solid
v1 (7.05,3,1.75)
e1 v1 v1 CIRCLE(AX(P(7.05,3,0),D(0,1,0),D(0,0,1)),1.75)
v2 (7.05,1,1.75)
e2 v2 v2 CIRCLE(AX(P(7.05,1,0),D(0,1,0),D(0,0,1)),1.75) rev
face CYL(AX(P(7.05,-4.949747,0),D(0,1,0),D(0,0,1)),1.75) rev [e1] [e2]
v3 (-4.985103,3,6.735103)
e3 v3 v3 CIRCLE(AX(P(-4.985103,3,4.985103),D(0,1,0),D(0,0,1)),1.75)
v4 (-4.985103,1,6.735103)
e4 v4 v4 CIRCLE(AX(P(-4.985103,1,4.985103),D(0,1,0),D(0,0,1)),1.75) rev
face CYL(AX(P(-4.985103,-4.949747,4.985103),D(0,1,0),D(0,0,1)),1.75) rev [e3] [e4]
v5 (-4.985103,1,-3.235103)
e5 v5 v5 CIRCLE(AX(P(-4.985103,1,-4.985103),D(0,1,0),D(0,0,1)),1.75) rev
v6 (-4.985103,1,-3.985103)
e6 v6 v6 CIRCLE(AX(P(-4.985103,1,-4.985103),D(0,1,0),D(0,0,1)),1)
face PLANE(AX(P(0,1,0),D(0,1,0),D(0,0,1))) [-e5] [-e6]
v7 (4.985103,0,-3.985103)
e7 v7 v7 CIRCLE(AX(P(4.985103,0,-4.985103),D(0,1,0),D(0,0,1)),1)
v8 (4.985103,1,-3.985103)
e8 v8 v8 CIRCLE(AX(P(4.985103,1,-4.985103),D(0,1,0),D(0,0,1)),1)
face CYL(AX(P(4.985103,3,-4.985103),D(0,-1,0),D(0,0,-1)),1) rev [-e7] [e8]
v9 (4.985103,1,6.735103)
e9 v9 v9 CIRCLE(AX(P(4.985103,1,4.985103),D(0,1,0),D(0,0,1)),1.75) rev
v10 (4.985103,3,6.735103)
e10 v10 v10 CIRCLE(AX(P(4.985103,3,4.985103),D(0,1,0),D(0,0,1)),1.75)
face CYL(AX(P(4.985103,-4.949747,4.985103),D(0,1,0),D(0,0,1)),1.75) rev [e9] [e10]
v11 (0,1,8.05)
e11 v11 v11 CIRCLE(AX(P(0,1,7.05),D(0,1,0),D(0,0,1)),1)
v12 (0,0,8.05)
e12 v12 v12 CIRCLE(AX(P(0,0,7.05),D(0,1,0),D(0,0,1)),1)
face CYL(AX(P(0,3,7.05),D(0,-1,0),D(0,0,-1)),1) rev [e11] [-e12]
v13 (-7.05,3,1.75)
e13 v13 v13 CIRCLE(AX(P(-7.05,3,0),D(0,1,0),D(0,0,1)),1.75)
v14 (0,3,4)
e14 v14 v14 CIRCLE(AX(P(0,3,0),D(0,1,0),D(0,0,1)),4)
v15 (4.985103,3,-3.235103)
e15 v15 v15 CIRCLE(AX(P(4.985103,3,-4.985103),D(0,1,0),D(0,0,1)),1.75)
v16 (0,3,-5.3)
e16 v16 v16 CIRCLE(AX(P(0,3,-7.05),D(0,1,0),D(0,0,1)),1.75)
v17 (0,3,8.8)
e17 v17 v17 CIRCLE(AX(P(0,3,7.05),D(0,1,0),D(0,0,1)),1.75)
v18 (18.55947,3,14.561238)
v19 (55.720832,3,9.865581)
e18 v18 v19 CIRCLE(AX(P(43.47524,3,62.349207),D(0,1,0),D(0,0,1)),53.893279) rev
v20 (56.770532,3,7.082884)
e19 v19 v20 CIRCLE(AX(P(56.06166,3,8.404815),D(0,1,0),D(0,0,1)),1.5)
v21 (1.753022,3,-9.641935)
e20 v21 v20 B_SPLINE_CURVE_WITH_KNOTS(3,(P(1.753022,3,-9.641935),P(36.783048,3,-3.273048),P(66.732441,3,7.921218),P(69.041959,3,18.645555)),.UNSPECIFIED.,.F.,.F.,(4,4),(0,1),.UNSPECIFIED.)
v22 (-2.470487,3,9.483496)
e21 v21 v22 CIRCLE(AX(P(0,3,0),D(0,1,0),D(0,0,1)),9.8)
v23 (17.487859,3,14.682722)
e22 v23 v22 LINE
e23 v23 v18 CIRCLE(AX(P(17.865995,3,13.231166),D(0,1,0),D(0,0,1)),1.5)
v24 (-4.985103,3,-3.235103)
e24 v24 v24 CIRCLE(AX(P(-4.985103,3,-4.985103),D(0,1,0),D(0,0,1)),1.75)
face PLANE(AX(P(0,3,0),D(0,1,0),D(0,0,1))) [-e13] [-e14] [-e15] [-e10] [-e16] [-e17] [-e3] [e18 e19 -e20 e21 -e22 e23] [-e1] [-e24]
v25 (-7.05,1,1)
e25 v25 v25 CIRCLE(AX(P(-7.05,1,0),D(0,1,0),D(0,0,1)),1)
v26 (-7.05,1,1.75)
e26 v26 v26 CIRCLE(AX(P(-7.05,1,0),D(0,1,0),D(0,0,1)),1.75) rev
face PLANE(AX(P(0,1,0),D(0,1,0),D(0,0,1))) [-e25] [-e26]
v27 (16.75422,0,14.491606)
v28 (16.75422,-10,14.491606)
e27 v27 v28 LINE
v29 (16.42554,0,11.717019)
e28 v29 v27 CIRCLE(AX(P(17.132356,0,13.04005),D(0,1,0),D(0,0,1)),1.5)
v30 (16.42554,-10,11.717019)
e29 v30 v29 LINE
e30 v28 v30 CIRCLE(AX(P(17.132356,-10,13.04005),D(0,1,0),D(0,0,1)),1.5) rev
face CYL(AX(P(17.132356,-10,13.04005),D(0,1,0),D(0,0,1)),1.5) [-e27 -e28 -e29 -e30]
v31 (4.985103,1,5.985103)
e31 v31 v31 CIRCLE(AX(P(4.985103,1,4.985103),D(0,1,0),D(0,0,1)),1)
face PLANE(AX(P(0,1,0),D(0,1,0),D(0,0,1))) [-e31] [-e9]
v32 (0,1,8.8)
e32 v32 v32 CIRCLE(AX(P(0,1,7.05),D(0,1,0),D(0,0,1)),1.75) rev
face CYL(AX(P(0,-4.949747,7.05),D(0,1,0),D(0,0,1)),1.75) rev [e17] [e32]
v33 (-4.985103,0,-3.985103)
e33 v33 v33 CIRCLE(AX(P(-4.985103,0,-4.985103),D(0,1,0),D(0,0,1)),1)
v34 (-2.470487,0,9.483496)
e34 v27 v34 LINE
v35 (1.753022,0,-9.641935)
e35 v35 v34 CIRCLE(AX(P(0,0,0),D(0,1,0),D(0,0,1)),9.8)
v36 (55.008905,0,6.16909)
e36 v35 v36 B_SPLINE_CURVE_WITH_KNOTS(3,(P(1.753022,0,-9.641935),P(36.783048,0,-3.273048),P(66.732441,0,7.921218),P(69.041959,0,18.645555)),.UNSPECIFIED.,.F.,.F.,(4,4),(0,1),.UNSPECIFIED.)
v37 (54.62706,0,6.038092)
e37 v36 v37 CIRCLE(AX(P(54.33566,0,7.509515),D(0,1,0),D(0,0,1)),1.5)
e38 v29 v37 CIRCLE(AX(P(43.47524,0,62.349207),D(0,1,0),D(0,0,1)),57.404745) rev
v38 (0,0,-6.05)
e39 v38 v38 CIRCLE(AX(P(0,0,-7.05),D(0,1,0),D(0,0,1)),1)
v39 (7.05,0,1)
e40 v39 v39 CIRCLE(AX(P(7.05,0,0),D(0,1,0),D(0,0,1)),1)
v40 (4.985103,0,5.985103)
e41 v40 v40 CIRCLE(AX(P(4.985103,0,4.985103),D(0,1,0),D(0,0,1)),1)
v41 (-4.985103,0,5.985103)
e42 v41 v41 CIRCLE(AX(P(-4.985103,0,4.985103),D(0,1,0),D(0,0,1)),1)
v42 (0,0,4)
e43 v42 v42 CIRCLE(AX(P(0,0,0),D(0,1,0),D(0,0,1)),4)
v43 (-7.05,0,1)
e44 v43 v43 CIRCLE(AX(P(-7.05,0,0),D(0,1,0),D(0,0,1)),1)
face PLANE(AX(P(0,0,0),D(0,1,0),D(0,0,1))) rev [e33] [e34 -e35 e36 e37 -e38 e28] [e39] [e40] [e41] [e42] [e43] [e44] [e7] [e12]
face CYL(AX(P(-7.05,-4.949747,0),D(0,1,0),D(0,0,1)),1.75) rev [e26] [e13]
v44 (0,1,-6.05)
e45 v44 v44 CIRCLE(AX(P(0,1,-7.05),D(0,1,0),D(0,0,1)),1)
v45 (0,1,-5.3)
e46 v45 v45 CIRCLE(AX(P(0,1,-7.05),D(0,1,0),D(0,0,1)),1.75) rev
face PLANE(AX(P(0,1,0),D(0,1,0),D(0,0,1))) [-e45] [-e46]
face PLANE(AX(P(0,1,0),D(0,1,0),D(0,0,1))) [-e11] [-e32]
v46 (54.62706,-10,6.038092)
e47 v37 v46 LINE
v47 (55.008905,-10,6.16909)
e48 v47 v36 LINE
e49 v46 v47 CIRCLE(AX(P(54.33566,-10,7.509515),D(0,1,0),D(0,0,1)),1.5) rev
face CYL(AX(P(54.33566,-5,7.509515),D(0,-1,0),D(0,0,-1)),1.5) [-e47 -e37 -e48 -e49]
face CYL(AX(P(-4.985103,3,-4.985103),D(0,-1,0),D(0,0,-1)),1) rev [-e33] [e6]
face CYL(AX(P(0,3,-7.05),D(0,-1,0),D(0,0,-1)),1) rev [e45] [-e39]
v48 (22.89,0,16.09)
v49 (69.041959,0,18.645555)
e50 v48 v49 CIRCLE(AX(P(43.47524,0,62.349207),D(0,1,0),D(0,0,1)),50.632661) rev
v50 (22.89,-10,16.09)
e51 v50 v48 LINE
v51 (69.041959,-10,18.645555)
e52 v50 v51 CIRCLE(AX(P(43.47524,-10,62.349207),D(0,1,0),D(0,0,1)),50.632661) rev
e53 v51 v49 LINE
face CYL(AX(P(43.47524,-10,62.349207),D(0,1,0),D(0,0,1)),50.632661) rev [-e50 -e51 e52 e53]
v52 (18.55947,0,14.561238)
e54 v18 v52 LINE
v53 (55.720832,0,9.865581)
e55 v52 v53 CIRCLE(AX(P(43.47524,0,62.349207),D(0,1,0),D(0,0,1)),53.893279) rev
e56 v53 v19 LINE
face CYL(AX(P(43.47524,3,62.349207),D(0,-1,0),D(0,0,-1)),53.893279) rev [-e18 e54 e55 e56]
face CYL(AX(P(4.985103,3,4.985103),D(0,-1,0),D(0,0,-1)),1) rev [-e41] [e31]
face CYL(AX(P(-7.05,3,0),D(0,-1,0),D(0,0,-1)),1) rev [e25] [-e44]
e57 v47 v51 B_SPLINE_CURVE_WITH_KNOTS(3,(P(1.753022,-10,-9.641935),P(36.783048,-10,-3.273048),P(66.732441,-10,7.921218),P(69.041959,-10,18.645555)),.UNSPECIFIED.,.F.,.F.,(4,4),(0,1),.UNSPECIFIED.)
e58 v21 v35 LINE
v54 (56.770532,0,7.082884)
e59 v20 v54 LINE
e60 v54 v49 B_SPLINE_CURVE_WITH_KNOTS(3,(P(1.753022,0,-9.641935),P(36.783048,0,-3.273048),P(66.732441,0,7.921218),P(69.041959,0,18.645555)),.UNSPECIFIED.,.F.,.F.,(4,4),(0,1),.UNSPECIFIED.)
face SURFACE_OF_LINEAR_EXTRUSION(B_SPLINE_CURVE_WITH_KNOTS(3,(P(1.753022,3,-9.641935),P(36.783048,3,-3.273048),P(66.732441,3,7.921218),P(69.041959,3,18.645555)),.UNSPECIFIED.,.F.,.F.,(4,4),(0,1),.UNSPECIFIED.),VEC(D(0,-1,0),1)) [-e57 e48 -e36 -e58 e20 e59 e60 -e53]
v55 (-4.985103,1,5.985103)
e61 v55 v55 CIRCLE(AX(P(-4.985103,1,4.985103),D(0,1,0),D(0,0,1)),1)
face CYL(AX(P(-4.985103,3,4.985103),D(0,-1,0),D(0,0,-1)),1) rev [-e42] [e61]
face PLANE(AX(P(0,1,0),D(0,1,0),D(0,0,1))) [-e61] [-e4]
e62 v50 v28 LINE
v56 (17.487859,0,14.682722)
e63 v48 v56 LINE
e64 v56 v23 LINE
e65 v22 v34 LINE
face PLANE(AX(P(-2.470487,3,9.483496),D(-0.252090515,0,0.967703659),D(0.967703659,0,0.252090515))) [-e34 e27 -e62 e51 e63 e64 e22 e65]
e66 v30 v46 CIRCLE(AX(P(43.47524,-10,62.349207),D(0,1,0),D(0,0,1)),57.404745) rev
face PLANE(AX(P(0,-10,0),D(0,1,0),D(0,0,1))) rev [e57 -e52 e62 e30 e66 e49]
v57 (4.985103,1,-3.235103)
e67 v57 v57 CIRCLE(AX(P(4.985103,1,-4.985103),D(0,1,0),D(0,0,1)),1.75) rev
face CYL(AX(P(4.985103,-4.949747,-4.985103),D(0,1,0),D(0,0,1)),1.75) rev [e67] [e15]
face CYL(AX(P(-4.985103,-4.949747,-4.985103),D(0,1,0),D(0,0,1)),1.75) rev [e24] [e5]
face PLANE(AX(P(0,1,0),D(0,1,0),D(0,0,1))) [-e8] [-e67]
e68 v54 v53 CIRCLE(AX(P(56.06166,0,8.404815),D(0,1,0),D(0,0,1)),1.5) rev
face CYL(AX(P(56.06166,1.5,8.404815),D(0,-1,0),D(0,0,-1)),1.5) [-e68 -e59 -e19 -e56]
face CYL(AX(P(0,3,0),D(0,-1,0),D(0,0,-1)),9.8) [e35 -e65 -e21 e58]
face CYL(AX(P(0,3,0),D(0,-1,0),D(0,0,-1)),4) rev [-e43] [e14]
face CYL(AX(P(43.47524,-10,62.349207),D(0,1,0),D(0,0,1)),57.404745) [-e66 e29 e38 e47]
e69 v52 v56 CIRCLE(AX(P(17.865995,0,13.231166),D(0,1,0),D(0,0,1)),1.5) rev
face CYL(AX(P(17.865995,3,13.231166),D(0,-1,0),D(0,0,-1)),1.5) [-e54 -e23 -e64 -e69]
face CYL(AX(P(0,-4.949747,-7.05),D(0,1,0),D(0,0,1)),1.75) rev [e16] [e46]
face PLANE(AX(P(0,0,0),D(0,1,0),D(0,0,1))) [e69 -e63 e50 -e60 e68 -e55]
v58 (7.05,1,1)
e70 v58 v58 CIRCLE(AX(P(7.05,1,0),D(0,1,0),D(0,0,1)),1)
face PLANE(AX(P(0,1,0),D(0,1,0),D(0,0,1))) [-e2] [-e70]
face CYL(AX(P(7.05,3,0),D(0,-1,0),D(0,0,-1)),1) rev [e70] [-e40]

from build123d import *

# Parameters (mm, degrees)
SKETCH1_R           = 1
SKETCH1_R_2         = 4
BOSS_EXTRUDE1_DEPTH = 3
BOSS_EXTRUDE2_START = -10
BOSS_EXTRUDE2_DEPTH = 10
SKETCH2_R           = 1.75
CUT_EXTRUDE1_DEPTH  = 2
FILLET1_DEPTH       = 4
FILLET1_START       = -10
FILLET1_2_DEPTH     = 10


with BuildPart() as part:
    # Sketch1 → Boss-Extrude1 (new body)
    with BuildSketch(Plane(origin=(0, 0, 0), x_dir=(1, 0, 0), z_dir=(0, 1, 0))):
        with BuildLine():
            ThreePointArc((18.051481703, -14.829547427), (41.662522, -8.486422092), (65.646603069, -13.227763489))
            add(Edge.make_bspline(
                [(65.646603069, -13.227763489), (56.529791546, -4.297397801), (30.90013189, 4.342634152), (1.753021735, 9.641935221)],
                knots=[0.6061191, 0.6061191, 0.6061191, 0.6061191, 1.438179848, 1.438179848, 1.438179848, 1.438179848], degree=3))
            ThreePointArc((1.753021735, 9.641935221), (-9.569441867, 2.113239778), (-2.470487043, -9.483495862))
            Line((-2.470487043, -9.483495862), (18.051481703, -14.829547427))
        make_face()
        with Locations(Location((0, 7.05, 0), (0, 0, 270))):
            Circle(SKETCH1_R, mode=Mode.SUBTRACT)
        with Locations(Location((0, -7.05, 0), (0, 0, 270))):
            Circle(SKETCH1_R, mode=Mode.SUBTRACT)
        with Locations(Location((-4.985102807, -4.985102807, 0), (0, 0, 270))):
            Circle(SKETCH1_R, mode=Mode.SUBTRACT)
        with Locations(Location((4.985102807, -4.985102807, 0), (0, 0, 270))):
            Circle(SKETCH1_R, mode=Mode.SUBTRACT)
        with Locations(Location((-7.05, 0, 0), (0, 0, 270))):
            Circle(SKETCH1_R, mode=Mode.SUBTRACT)
        with Locations(Location((0, 0, 0), (0, 0, 270))):
            Circle(SKETCH1_R_2, mode=Mode.SUBTRACT)
        with Locations(Location((7.05, 0, 0), (0, 0, 270))):
            Circle(SKETCH1_R, mode=Mode.SUBTRACT)
        with Locations(Location((-4.985102807, 4.985102807, 0), (0, 0, 270))):
            Circle(SKETCH1_R, mode=Mode.SUBTRACT)
        with Locations(Location((4.985102807, 4.985102807, 0), (0, 0, 270))):
            Circle(SKETCH1_R, mode=Mode.SUBTRACT)
    extrude(amount=BOSS_EXTRUDE1_DEPTH)

    # Sketch1<3> → Boss-Extrude2 (add)
    with BuildSketch(Plane(origin=(0, 0, 0), x_dir=(1, 0, 0), z_dir=(0, 1, 0)).offset(BOSS_EXTRUDE2_START)):
        with BuildLine():
            Line((18.051481703, -14.829547427), (22.89, -16.09))
            ThreePointArc((22.89, -16.09), (46.274614562, -11.793991127), (69.041958929, -18.64555452))
            add(Edge.make_bspline(
                [(65.646603069, -13.227763489), (67.486697691, -15.030226755), (68.654100184, -16.844517492), (69.041958929, -18.64555452)],
                knots=[0.832060748, 0.832060748, 0.832060748, 0.832060748, 1, 1, 1, 1], degree=3))
            ThreePointArc((65.646603069, -13.227763489), (41.662522, -8.486422092), (18.051481703, -14.829547427))
        make_face()
        with BuildLine():
            Line((13.212963406, -13.569094854), (18.051481703, -14.829547427))
            ThreePointArc((18.051481703, -14.829547427), (41.662522, -8.486422092), (65.646603069, -13.227763489))
            add(Edge.make_bspline(
                [(54.827143585, -6.078086241), (59.477760605, -8.399185567), (63.170981642, -10.802770431), (65.646603069, -13.227763489)],
                knots=[0.6061191, 0.6061191, 0.6061191, 0.6061191, 0.832060748, 0.832060748, 0.832060748, 0.832060748], degree=3))
            ThreePointArc((54.827143585, -6.078086241), (33.305217678, -5.852522289), (13.212963406, -13.569094854))
        make_face()
    extrude(amount=BOSS_EXTRUDE2_DEPTH)

    # Sketch2 → Cut-Extrude1 (cut)
    with BuildSketch(Plane(origin=(0, 3, 0), x_dir=(1, 0, 0), z_dir=(0, 1, 0))):
        with Locations(Location((0, 7.05, 0), (0, 0, 270))):
            Circle(SKETCH2_R)
        with Locations(Location((4.985102807, 4.985102807, 0), (0, 0, 270))):
            Circle(SKETCH2_R)
        with Locations(Location((7.05, 0, 0), (0, 0, 270))):
            Circle(SKETCH2_R)
        with Locations(Location((4.985102807, -4.985102807, 0), (0, 0, 270))):
            Circle(SKETCH2_R)
        with Locations(Location((0, -7.05, 0), (0, 0, 270))):
            Circle(SKETCH2_R)
        with Locations(Location((-4.985102807, -4.985102807, 0), (0, 0, 270))):
            Circle(SKETCH2_R)
        with Locations(Location((-7.05, 0, 0), (0, 0, 270))):
            Circle(SKETCH2_R)
        with Locations(Location((-4.985102807, 4.985102807, 0), (0, 0, 270))):
            Circle(SKETCH2_R)
    extrude(amount=-CUT_EXTRUDE1_DEPTH, mode=Mode.SUBTRACT)

    # Fillet1: read off the stored shape, not the designer's step
    # Fillet1 outline → Fillet1 (cut)
    with BuildSketch(Plane(origin=(0, 0, 0), x_dir=(1, 0, 0), z_dir=(0, 1, 0))):
        with BuildLine():
            add(Edge.make_bspline(
                [(56.770531977, -7.082884332), (60.513292136, -9.089900017), (63.526462064, -11.150981005), (65.646603069, -13.227763489)],
                knots=[0.638562604, 0.638562604, 0.638562604, 0.638562604, 0.832060748, 0.832060748, 0.832060748, 0.832060748], degree=3))
            ThreePointArc((56.770531977, -7.082884332), (57.465125309, -8.934236095), (55.720831584, -9.865580632))
            ThreePointArc((55.720831584, -9.865580632), (60.765635031, -11.304836191), (65.646603069, -13.227763489))
        make_face()
        with BuildLine():
            ThreePointArc((18.559470243, -14.56123833), (18.034960356, -14.721619309), (17.487859224, -14.682721609))
            Line((17.487859224, -14.682721609), (18.051481703, -14.829547427))
            ThreePointArc((18.051481703, -14.829547427), (18.305118454, -14.69471599), (18.559470243, -14.56123833))
        make_face()
    extrude(amount=FILLET1_DEPTH, mode=Mode.SUBTRACT)

    # Fillet1 2 outline → Fillet1 2 (cut)
    with BuildSketch(Plane(origin=(0, 0, 0), x_dir=(1, 0, 0), z_dir=(0, 1, 0)).offset(FILLET1_START)):
        with BuildLine():
            ThreePointArc((54.827143585, -6.078086241), (54.727119613, -6.058000301), (54.627060101, -6.038092157))
            ThreePointArc((54.627060101, -6.038092157), (54.822409803, -6.090686613), (55.008905492, -6.169089678))
            add(Edge.make_bspline(
                [(54.827143585, -6.078086241), (54.887894452, -6.10840669), (54.948481948, -6.138741214), (55.008905492, -6.169089678)],
                knots=[0.6061191, 0.6061191, 0.6061191, 0.6061191, 0.609070569, 0.609070569, 0.609070569, 0.609070569], degree=3))
        make_face()
        with BuildLine():
            ThreePointArc((16.754219894, -14.49160575), (15.642770878, -13.216507508), (16.425540404, -11.717018824))
            ThreePointArc((16.425540404, -11.717018824), (14.804293031, -12.617109451), (13.212963406, -13.569094854))
            Line((13.212963406, -13.569094854), (16.754219894, -14.49160575))
        make_face()
    extrude(amount=FILLET1_2_DEPTH, mode=Mode.SUBTRACT)


solid = part.part
